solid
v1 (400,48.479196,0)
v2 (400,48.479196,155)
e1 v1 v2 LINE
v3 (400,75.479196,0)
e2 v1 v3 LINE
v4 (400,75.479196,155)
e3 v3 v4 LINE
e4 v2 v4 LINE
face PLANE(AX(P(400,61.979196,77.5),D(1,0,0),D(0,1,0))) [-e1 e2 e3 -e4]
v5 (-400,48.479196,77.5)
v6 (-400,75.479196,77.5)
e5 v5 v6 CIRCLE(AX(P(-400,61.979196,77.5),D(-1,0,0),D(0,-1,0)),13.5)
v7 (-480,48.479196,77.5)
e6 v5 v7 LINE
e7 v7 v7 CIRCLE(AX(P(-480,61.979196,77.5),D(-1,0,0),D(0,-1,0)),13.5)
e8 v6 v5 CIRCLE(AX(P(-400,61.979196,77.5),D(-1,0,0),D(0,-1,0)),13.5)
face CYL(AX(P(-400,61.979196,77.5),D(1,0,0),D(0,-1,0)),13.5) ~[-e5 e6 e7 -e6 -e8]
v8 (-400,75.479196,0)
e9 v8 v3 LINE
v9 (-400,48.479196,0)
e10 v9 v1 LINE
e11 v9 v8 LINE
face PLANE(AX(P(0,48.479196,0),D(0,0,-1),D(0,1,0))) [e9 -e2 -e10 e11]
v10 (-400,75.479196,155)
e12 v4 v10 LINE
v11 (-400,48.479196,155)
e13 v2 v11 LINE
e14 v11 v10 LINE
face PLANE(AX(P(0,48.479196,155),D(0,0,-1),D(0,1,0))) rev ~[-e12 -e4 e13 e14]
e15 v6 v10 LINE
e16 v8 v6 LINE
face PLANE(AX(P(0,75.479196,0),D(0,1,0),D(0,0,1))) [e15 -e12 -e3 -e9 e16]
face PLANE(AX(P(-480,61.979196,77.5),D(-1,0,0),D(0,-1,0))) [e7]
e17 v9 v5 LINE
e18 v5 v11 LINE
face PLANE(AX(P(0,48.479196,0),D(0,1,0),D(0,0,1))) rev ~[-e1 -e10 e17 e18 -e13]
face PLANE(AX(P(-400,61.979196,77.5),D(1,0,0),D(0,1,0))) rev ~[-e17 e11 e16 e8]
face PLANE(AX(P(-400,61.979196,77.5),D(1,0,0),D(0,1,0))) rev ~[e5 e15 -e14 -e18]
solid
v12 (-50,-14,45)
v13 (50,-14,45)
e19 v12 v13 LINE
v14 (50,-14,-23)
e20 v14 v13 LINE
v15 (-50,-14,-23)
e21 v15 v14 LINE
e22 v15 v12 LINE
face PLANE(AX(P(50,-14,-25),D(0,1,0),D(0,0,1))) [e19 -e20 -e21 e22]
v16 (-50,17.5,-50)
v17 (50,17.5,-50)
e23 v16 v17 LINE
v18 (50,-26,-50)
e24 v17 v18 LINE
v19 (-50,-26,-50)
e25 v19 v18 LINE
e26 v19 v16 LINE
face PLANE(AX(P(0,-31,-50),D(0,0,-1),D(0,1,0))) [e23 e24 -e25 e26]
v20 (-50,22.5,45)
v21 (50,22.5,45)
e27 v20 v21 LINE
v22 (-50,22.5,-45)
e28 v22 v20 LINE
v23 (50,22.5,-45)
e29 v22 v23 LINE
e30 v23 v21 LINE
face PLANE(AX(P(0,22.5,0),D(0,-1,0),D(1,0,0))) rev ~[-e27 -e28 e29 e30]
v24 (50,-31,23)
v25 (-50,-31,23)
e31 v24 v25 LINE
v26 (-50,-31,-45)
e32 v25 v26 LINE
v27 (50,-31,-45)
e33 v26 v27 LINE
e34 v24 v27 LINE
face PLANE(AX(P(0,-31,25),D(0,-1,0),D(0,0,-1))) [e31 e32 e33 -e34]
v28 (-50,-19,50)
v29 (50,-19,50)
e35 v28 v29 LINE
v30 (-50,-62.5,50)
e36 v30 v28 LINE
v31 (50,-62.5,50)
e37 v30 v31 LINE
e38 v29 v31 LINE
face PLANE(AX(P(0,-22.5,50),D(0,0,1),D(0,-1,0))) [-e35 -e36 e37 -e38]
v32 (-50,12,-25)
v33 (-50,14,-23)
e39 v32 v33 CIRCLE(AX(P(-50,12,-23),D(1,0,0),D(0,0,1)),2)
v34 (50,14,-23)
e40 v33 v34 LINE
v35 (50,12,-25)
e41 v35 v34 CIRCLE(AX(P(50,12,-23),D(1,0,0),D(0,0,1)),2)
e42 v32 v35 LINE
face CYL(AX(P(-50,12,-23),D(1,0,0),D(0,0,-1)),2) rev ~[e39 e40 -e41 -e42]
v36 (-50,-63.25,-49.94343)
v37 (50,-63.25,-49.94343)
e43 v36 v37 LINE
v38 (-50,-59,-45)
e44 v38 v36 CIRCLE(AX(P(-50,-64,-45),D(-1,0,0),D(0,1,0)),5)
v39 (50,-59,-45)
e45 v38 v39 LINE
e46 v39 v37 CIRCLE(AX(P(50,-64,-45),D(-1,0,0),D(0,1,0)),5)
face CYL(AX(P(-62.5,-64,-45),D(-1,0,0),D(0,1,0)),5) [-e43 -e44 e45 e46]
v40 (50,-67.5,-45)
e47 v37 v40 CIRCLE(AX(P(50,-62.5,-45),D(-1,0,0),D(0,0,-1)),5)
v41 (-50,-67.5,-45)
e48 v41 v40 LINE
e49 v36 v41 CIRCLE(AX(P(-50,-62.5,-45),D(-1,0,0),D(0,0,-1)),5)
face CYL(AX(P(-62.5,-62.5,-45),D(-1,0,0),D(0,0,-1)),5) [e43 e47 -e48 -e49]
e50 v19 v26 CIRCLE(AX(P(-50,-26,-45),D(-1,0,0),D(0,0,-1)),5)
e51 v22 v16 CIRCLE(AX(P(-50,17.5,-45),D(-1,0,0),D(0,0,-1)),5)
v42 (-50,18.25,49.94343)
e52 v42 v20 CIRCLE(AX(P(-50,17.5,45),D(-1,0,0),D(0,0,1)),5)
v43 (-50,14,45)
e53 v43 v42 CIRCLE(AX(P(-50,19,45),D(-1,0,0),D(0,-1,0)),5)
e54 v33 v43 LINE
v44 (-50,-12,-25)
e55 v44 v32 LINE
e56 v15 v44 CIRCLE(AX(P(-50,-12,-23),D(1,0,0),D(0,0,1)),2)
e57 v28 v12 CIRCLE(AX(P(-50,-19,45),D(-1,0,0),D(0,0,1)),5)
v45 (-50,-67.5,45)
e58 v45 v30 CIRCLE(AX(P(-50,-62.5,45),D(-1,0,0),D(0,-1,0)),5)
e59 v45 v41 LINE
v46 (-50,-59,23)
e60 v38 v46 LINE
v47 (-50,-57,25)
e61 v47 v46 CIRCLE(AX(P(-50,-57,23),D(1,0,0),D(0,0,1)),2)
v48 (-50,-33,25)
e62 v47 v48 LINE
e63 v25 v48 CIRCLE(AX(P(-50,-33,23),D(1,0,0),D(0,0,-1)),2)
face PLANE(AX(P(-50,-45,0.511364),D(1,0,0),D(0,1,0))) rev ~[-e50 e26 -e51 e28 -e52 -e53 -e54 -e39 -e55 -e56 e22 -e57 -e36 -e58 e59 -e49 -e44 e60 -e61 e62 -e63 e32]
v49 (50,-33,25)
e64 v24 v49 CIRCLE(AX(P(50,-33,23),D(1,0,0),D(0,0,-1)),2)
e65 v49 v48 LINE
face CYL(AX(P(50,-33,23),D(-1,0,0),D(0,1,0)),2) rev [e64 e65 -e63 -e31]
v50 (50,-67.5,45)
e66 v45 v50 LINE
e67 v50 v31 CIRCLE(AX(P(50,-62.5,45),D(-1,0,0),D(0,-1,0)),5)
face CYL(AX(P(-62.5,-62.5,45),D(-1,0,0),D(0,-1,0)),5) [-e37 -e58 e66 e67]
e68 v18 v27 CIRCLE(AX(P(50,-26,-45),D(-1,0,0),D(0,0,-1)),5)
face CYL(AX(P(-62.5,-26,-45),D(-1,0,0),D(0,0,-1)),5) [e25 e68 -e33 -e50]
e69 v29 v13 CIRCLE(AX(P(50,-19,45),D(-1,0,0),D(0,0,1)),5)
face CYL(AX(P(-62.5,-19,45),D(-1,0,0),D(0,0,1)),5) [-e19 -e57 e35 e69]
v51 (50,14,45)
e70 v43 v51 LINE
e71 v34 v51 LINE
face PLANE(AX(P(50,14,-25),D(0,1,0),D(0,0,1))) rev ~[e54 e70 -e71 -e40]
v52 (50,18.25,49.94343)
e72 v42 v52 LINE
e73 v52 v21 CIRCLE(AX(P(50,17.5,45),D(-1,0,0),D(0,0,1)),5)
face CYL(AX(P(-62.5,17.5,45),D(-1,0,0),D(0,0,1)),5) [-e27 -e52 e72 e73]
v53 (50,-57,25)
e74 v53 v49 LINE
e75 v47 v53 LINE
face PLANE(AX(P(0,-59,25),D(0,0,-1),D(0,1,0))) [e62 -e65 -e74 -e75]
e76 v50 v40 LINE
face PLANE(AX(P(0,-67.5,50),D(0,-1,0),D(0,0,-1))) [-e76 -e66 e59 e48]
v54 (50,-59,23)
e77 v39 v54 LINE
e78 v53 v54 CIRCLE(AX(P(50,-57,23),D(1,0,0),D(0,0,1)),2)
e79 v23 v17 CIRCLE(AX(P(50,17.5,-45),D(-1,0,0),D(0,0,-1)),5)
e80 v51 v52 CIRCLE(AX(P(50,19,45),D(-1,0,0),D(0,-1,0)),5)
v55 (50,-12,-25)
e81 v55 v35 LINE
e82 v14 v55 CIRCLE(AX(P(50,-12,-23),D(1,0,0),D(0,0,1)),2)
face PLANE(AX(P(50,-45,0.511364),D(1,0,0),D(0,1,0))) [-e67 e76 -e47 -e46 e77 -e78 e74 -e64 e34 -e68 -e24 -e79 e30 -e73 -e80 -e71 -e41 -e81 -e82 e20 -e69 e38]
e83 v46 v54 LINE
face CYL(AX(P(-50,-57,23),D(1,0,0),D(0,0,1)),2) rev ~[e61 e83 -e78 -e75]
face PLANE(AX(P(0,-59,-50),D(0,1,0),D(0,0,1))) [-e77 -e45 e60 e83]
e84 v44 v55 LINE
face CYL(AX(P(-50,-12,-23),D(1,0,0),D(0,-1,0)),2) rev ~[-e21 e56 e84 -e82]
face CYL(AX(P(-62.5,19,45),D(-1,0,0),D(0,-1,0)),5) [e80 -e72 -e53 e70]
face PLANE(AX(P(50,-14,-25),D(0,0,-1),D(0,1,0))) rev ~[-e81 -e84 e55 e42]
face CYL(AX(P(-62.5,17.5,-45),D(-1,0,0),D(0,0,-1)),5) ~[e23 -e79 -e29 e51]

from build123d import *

# Parameters (mm, degrees)
F0_W        = 100
F0_H        = 100
F1_DEPTH    = 22.5
F2_W        = 28
F2_H        = 75
F3_DEPTH    = 100
F5_DEPTH    = 50
F6_T1_DEPTH = 125
F7_R        = 2
F8_W        = 27
F8_H        = 155
F9_DEPTH    = 400
F10_R       = 13.5
F11_DEPTH   = 80


# Not quite as in the source:
# - a fillet or chamfer that OpenCascade refuses, or shapes differently, is made with other operations: its cross-section is extruded or revolved along the edge and cut away or added


with BuildPart() as f1:
    # F0 (on Front) → F1 (new body, symmetric)
    with BuildSketch(Plane.XZ):
        Rectangle(F0_W, F0_H)
    extrude(amount=F1_DEPTH, both=True)

    # F2 (on face) → F3 (cut, symmetric)
    with BuildSketch(Plane.YZ.offset(50)):
        with Locations((0, 12.5)):
            Rectangle(F2_W, F2_H)
    extrude(amount=F3_DEPTH, both=True, mode=Mode.SUBTRACT)

    # F4 (on Right) → F5 (join, symmetric)
    with BuildSketch(Plane.YZ):
        Polygon((-22.5, -50), (-22.5, 50), (-67.5, 50), (-67.5, -50), (-59, -50), (-59, 25), (-31, 25), (-31, -50), align=None)
    extrude(amount=F5_DEPTH, both=True)

    # F6: fillet of radius 5 on 8 edges, made by hand

    # F6_s2 → F6_t1 (cut)
    with BuildSketch(Plane.YZ.offset(-62.5)):
        with BuildLine():
            ThreePointArc((-19, 50), (-15.4644660941, 48.5355339059), (-14, 45))
            Line((-14, 45), (-14, 50))
            Line((-14, 50), (-19, 50))
        make_face()
        with BuildLine():
            ThreePointArc((14, 45), (15.4644660941, 48.5355339059), (19, 50))
            Line((19, 50), (14, 50))
            Line((14, 50), (14, 45))
        make_face()
        with BuildLine():
            ThreePointArc((-59, -45), (-60.4644660941, -48.5355339059), (-64, -50))
            Line((-64, -50), (-59, -50))
            Line((-59, -50), (-59, -45))
        make_face()
        with BuildLine():
            ThreePointArc((-67.5, 45), (-66.0355339059, 48.5355339059), (-62.5, 50))
            Line((-62.5, 50), (-67.5, 50))
            Line((-67.5, 50), (-67.5, 45))
        make_face()
        with BuildLine():
            ThreePointArc((-62.5, -50), (-66.0355339059, -48.5355339059), (-67.5, -45))
            Line((-67.5, -45), (-67.5, -50))
            Line((-67.5, -50), (-62.5, -50))
        make_face()
        with BuildLine():
            ThreePointArc((17.5, 50), (21.0355339059, 48.5355339059), (22.5, 45))
            Line((22.5, 45), (22.5, 50))
            Line((22.5, 50), (17.5, 50))
        make_face()
        with BuildLine():
            ThreePointArc((-26, -50), (-29.5355339059, -48.5355339059), (-31, -45))
            Line((-31, -45), (-31, -50))
            Line((-31, -50), (-26, -50))
        make_face()
        with BuildLine():
            ThreePointArc((17.5, -50), (21.0355339059, -48.5355339059), (22.5, -45))
            Line((22.5, -45), (22.5, -50))
            Line((22.5, -50), (17.5, -50))
        make_face()
    extrude(amount=F6_T1_DEPTH, mode=Mode.SUBTRACT)

    # F7
    f7_edges = [f1.edges().sort_by_distance(p)[0] for p in [
        (0, 14, -25),
        (0, -14, -25),
        (0, -31, 25),
        (0, -59, 25),
    ]]
    fillet(f7_edges, radius=F7_R)


with BuildPart() as f9:
    # F8 (on Right) → F9 (new body, symmetric)
    with BuildSketch(Plane.YZ):
        with Locations((61.9791960033, 77.5)):
            Rectangle(F8_W, F8_H)
    extrude(amount=F9_DEPTH, both=True)

    # F10 (on face) → F11 (join)
    with BuildSketch(Plane(origin=(-400, 0, 0), x_dir=(0, -1, 0), z_dir=(-1, 0, 0))):
        with Locations((-61.9791960033, 77.5)):
            Circle(F10_R)
    extrude(amount=F11_DEPTH)


solid = Compound([f1.part, f9.part])
